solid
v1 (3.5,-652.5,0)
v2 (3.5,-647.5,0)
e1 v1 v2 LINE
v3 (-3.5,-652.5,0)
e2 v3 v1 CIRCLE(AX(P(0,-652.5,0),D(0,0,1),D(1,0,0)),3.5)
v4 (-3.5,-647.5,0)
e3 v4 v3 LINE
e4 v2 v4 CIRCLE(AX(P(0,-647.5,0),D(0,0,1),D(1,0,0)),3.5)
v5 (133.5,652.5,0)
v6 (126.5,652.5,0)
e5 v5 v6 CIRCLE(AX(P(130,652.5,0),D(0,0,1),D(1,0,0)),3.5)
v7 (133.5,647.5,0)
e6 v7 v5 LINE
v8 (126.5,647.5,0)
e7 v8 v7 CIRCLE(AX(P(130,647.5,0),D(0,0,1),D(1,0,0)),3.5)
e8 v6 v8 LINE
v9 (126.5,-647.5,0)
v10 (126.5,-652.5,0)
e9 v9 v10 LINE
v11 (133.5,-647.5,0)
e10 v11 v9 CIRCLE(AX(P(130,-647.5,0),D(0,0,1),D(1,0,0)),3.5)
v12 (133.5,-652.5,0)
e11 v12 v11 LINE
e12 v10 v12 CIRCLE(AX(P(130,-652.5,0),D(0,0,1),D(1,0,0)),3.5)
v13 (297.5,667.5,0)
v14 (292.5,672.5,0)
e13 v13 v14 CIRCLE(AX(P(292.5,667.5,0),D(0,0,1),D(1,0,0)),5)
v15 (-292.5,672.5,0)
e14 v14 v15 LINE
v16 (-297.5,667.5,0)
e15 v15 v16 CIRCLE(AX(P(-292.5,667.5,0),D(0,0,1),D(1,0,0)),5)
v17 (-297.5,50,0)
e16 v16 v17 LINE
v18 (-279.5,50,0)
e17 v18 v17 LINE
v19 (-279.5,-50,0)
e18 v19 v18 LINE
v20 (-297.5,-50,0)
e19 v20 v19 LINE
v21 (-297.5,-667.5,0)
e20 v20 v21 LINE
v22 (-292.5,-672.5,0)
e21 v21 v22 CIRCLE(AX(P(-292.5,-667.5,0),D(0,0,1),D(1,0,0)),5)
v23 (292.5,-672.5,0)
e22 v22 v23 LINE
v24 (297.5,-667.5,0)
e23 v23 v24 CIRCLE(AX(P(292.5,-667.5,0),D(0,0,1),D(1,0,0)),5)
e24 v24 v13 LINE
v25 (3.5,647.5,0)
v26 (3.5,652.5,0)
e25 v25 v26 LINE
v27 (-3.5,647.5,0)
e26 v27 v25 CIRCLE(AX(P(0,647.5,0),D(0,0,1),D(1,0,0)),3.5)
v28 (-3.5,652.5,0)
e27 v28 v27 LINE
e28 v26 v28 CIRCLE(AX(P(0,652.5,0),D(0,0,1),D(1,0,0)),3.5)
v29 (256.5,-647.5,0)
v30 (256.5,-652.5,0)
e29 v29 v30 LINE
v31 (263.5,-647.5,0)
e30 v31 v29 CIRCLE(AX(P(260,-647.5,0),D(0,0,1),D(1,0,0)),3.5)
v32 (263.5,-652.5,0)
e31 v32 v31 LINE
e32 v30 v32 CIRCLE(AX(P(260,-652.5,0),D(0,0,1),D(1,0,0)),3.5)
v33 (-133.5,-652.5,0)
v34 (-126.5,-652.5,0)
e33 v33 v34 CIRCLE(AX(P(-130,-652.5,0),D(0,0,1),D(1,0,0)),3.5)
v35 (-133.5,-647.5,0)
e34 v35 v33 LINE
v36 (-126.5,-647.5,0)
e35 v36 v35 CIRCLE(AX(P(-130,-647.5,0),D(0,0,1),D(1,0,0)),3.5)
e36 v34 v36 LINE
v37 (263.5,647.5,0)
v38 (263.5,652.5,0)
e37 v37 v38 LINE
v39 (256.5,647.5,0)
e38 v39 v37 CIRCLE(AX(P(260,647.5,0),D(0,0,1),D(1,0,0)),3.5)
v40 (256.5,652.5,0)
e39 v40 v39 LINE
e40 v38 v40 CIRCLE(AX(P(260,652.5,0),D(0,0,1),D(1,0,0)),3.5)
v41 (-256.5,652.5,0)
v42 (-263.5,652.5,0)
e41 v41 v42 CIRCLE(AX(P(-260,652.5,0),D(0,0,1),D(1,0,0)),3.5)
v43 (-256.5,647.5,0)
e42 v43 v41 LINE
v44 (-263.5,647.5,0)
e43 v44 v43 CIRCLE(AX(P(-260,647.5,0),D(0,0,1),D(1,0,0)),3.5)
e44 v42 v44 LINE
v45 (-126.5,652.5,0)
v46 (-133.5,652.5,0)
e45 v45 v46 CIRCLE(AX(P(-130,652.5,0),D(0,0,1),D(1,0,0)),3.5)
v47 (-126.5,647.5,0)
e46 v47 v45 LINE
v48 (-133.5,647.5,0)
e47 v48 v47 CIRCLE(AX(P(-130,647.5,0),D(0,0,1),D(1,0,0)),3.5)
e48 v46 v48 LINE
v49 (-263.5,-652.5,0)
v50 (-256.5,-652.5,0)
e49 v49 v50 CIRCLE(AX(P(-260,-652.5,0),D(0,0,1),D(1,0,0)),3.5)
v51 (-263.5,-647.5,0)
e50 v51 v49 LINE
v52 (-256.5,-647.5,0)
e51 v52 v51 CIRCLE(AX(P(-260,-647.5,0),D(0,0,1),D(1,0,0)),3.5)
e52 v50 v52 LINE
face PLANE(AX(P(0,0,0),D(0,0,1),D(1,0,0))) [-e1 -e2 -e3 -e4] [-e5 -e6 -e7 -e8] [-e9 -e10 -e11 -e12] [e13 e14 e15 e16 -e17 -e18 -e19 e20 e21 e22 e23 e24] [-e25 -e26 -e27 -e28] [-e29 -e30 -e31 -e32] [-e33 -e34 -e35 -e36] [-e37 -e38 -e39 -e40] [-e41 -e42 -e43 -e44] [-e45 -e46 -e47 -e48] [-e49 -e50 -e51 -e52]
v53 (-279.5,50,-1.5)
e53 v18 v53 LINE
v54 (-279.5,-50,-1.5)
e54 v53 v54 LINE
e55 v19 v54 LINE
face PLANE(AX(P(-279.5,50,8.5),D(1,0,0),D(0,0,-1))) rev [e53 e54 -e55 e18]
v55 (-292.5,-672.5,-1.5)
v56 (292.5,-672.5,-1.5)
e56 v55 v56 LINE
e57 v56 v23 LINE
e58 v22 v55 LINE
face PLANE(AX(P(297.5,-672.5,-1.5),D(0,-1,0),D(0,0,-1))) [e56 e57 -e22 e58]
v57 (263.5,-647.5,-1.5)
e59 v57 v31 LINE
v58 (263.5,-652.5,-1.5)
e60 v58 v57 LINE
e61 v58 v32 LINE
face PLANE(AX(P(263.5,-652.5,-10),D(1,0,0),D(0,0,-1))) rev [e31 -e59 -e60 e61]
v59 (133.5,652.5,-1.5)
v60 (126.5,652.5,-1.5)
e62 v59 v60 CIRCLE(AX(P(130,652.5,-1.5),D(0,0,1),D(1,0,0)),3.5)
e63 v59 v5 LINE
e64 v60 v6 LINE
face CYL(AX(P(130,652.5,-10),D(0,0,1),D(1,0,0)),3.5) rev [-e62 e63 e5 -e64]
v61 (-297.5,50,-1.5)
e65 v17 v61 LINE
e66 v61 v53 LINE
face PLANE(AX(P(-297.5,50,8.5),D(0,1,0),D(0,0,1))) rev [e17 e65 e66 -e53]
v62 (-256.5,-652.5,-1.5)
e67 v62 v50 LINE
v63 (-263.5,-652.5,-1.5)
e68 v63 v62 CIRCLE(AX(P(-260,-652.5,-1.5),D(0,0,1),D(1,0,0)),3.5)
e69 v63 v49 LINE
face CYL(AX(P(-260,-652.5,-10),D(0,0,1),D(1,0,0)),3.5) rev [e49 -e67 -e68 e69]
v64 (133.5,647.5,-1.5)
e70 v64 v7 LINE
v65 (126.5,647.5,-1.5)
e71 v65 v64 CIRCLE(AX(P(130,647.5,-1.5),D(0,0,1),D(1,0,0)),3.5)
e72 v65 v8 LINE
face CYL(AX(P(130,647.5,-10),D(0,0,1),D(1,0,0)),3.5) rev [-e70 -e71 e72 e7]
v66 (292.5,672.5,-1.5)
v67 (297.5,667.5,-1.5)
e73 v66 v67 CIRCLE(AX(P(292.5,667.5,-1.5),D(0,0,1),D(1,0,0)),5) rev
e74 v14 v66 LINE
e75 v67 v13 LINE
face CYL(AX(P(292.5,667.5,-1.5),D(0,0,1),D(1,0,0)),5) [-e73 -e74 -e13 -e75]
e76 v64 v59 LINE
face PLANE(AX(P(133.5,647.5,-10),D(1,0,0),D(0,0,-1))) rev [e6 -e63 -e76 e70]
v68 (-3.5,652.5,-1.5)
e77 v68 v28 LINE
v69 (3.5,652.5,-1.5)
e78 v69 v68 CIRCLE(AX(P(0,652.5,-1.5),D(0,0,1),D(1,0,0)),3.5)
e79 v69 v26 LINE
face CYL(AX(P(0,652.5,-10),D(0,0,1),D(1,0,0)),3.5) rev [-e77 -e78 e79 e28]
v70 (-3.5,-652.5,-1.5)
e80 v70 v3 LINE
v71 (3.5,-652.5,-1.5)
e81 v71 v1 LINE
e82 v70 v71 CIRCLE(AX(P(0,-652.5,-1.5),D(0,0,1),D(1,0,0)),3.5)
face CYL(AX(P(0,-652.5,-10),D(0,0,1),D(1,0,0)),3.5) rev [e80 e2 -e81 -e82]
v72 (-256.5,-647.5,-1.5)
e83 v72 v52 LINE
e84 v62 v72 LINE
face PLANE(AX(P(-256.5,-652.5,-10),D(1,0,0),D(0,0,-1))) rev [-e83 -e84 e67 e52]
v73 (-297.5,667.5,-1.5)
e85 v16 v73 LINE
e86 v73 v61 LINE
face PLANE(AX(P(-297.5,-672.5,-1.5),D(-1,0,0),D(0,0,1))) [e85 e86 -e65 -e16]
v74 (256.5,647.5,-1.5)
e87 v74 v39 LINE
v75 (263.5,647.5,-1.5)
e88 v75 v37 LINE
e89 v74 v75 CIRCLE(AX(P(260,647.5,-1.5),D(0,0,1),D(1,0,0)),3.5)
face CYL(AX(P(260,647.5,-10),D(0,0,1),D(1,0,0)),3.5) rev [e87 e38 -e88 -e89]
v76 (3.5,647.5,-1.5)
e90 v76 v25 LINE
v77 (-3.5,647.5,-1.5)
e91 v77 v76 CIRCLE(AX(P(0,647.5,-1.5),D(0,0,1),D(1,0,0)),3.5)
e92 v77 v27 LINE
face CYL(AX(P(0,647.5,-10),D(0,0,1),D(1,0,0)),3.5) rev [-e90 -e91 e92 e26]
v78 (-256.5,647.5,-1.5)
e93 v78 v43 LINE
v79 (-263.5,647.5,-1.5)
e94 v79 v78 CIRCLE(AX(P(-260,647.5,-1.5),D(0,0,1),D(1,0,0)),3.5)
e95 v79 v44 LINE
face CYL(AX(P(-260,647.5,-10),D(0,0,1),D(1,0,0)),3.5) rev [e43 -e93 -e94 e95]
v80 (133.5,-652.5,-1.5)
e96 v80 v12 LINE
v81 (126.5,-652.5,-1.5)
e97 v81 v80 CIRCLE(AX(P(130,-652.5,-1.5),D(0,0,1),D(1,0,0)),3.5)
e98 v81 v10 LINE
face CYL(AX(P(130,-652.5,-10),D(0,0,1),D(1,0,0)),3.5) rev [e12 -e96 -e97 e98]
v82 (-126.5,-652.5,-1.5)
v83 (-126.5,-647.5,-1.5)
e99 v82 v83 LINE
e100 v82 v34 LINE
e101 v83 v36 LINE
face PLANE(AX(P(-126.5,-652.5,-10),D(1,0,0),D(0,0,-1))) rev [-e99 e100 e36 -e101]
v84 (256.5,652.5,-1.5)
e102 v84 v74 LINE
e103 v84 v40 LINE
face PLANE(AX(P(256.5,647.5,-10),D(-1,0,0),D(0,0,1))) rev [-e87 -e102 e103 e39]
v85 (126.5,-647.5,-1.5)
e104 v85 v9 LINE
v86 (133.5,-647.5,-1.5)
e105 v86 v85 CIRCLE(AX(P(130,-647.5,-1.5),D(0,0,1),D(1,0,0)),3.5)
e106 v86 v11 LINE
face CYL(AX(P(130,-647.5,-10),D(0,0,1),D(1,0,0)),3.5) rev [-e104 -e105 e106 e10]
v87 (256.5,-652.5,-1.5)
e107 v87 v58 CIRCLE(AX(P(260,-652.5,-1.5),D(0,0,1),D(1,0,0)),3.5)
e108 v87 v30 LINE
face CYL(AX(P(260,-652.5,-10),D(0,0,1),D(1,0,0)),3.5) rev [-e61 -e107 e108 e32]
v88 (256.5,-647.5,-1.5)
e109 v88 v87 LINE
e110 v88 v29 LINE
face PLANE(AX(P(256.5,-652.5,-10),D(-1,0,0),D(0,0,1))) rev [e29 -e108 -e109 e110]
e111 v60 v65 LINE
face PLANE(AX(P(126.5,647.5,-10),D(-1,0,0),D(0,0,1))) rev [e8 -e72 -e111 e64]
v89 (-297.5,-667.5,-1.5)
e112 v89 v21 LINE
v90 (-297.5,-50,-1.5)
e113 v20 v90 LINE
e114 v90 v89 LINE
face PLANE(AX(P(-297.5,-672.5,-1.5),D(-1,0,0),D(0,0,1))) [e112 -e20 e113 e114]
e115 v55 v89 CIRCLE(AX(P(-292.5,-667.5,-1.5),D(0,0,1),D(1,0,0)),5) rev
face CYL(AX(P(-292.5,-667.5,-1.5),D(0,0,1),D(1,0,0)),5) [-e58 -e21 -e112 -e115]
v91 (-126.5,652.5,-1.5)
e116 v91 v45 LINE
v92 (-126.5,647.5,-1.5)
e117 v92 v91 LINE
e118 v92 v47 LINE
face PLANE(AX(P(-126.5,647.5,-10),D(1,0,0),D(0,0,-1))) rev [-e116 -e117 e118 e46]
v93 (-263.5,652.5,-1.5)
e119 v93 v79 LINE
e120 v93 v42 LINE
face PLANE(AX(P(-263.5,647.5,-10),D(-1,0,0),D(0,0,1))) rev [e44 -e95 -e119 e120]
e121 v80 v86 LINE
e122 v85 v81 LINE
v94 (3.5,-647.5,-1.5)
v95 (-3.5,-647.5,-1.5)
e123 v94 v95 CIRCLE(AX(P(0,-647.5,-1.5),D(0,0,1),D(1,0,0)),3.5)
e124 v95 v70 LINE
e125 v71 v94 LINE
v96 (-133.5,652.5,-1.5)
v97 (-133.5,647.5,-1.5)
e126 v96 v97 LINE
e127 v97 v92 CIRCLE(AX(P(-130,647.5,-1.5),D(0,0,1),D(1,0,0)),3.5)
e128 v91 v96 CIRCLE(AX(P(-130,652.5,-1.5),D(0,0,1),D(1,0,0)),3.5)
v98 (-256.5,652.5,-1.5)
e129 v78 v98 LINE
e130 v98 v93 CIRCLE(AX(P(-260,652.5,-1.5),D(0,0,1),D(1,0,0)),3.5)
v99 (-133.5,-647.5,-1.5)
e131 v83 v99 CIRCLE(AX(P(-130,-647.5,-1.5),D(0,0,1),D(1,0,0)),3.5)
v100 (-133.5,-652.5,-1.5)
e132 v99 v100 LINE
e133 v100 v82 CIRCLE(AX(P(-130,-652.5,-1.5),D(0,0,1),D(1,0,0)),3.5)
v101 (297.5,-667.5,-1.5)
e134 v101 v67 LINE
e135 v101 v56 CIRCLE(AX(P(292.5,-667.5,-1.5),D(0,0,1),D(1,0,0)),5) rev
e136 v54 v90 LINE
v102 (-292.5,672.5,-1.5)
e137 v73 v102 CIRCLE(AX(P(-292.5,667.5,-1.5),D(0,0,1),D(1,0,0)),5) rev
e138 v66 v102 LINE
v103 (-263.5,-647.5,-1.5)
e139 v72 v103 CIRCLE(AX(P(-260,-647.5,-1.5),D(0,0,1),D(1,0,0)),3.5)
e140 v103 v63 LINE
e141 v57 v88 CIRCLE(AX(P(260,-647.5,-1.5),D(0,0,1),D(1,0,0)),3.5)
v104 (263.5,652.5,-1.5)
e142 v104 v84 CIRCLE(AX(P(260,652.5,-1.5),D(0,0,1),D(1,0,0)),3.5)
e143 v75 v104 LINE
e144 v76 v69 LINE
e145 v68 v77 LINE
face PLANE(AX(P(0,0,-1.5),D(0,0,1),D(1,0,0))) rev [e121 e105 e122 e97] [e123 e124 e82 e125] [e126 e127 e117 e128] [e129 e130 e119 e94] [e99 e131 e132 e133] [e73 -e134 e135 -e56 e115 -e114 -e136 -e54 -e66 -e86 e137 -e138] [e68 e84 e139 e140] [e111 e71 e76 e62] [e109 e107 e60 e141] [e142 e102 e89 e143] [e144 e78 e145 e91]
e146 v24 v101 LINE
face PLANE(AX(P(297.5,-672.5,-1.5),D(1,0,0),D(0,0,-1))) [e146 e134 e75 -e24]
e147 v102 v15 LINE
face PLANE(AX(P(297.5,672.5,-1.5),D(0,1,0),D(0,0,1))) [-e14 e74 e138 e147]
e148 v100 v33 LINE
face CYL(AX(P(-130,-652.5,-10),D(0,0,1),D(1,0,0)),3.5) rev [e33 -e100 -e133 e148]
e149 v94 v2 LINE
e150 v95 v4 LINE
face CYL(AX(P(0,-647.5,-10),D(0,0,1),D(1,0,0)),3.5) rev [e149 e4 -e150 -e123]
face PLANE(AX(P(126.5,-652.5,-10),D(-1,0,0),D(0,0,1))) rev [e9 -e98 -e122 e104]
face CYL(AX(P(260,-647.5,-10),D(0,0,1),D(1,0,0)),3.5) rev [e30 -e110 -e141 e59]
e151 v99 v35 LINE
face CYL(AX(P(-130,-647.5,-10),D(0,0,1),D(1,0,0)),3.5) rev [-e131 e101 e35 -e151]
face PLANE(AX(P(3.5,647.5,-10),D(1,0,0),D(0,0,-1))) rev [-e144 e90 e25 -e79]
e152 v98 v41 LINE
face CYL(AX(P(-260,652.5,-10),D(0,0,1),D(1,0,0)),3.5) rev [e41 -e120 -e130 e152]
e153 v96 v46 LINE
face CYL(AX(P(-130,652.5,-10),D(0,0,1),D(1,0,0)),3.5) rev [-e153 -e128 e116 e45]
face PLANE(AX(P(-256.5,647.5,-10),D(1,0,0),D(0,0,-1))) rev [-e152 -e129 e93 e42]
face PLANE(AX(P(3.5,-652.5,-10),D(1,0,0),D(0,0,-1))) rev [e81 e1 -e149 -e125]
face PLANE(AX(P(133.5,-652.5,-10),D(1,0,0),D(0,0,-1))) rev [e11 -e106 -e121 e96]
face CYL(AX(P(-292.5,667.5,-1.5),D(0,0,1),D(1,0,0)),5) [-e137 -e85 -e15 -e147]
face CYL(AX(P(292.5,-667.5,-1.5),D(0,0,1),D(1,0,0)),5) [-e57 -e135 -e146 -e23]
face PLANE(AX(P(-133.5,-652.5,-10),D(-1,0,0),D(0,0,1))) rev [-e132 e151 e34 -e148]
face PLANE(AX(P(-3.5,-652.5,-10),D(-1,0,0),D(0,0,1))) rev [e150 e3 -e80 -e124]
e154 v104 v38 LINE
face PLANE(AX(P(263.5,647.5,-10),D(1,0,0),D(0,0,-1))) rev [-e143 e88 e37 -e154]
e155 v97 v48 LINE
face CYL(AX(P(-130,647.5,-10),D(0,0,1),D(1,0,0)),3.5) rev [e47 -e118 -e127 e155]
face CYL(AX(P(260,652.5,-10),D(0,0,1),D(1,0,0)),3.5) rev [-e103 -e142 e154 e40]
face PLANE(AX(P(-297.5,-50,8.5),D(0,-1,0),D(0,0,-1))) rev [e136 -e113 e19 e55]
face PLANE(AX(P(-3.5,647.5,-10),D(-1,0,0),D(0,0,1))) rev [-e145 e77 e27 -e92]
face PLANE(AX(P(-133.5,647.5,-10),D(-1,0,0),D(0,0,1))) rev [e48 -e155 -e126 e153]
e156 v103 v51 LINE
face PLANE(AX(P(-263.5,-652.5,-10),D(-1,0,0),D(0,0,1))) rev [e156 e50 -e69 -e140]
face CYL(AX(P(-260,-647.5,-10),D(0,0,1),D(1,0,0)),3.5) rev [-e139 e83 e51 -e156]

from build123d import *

# Parameters (mm, degrees)
SKETCH_1_W             = 595
SKETCH_1_H             = 1345
SM_BASE_FLANGE_1_DEPTH = 1.5
FILLET_1_R             = 5
CUT_EXTRUDE_1_DEPTH    = 10
PATTERN_LINEAR_1_COUNT = 5
PATTERN_LINEAR_1_PITCH = 130
SKETCH_3_W             = 18
SKETCH_3_H             = 100
CUT_EXTRUDE_2_DEPTH    = 10


# Sheet-metal steps are written as plain solids
with BuildPart() as part:
    # Sketch 1 → 基体-法兰1 (new body)
    with BuildSketch(Plane.XY):
        Rectangle(SKETCH_1_W, SKETCH_1_H)
    extrude(amount=-SM_BASE_FLANGE_1_DEPTH)

    # 圆角1
    fillet_1_edges = [part.edges().sort_by_distance(p)[0] for p in [
        (-297.5, 672.5, -0.75),
        (297.5, 672.5, -0.75),
        (297.5, -672.5, -0.75),
        (-297.5, -672.5, -0.75),
    ]]
    fillet(fillet_1_edges, radius=FILLET_1_R)

    # Sketch 2 → 切除-拉伸1 (cut)
    with BuildSketch(Plane.XY):
        with BuildLine():
            Line((-263.5, 647.5), (-263.5, 652.5))
            ThreePointArc((-263.5, 652.5), (-260, 656), (-256.5, 652.5))
            Line((-256.5, 652.5), (-256.5, 647.5))
            ThreePointArc((-256.5, 647.5), (-260, 644), (-263.5, 647.5))
        make_face()
        with BuildLine():
            Line((-263.5, -652.5), (-263.5, -647.5))
            ThreePointArc((-263.5, -647.5), (-260, -644), (-256.5, -647.5))
            Line((-256.5, -647.5), (-256.5, -652.5))
            ThreePointArc((-256.5, -652.5), (-260, -656), (-263.5, -652.5))
        make_face()
    cut_extrude_1 = extrude(amount=-CUT_EXTRUDE_1_DEPTH, mode=Mode.SUBTRACT)

    # 阵列(线性)1: 切除-拉伸1 ×5
    with Locations(*[(i * PATTERN_LINEAR_1_PITCH, 0, 0) for i in range(1, PATTERN_LINEAR_1_COUNT)]):
        add(cut_extrude_1, mode=Mode.SUBTRACT)

    # 草图3 → 切除-拉伸2 (cut)
    with BuildSketch(Plane(origin=(0, 0, -1.5), x_dir=(-1, 0, 0), z_dir=(0, 0, -1))):
        with Locations((288.5, 0)):
            Rectangle(SKETCH_3_W, SKETCH_3_H)
    extrude(amount=-CUT_EXTRUDE_2_DEPTH, mode=Mode.SUBTRACT)


solid = part.part
